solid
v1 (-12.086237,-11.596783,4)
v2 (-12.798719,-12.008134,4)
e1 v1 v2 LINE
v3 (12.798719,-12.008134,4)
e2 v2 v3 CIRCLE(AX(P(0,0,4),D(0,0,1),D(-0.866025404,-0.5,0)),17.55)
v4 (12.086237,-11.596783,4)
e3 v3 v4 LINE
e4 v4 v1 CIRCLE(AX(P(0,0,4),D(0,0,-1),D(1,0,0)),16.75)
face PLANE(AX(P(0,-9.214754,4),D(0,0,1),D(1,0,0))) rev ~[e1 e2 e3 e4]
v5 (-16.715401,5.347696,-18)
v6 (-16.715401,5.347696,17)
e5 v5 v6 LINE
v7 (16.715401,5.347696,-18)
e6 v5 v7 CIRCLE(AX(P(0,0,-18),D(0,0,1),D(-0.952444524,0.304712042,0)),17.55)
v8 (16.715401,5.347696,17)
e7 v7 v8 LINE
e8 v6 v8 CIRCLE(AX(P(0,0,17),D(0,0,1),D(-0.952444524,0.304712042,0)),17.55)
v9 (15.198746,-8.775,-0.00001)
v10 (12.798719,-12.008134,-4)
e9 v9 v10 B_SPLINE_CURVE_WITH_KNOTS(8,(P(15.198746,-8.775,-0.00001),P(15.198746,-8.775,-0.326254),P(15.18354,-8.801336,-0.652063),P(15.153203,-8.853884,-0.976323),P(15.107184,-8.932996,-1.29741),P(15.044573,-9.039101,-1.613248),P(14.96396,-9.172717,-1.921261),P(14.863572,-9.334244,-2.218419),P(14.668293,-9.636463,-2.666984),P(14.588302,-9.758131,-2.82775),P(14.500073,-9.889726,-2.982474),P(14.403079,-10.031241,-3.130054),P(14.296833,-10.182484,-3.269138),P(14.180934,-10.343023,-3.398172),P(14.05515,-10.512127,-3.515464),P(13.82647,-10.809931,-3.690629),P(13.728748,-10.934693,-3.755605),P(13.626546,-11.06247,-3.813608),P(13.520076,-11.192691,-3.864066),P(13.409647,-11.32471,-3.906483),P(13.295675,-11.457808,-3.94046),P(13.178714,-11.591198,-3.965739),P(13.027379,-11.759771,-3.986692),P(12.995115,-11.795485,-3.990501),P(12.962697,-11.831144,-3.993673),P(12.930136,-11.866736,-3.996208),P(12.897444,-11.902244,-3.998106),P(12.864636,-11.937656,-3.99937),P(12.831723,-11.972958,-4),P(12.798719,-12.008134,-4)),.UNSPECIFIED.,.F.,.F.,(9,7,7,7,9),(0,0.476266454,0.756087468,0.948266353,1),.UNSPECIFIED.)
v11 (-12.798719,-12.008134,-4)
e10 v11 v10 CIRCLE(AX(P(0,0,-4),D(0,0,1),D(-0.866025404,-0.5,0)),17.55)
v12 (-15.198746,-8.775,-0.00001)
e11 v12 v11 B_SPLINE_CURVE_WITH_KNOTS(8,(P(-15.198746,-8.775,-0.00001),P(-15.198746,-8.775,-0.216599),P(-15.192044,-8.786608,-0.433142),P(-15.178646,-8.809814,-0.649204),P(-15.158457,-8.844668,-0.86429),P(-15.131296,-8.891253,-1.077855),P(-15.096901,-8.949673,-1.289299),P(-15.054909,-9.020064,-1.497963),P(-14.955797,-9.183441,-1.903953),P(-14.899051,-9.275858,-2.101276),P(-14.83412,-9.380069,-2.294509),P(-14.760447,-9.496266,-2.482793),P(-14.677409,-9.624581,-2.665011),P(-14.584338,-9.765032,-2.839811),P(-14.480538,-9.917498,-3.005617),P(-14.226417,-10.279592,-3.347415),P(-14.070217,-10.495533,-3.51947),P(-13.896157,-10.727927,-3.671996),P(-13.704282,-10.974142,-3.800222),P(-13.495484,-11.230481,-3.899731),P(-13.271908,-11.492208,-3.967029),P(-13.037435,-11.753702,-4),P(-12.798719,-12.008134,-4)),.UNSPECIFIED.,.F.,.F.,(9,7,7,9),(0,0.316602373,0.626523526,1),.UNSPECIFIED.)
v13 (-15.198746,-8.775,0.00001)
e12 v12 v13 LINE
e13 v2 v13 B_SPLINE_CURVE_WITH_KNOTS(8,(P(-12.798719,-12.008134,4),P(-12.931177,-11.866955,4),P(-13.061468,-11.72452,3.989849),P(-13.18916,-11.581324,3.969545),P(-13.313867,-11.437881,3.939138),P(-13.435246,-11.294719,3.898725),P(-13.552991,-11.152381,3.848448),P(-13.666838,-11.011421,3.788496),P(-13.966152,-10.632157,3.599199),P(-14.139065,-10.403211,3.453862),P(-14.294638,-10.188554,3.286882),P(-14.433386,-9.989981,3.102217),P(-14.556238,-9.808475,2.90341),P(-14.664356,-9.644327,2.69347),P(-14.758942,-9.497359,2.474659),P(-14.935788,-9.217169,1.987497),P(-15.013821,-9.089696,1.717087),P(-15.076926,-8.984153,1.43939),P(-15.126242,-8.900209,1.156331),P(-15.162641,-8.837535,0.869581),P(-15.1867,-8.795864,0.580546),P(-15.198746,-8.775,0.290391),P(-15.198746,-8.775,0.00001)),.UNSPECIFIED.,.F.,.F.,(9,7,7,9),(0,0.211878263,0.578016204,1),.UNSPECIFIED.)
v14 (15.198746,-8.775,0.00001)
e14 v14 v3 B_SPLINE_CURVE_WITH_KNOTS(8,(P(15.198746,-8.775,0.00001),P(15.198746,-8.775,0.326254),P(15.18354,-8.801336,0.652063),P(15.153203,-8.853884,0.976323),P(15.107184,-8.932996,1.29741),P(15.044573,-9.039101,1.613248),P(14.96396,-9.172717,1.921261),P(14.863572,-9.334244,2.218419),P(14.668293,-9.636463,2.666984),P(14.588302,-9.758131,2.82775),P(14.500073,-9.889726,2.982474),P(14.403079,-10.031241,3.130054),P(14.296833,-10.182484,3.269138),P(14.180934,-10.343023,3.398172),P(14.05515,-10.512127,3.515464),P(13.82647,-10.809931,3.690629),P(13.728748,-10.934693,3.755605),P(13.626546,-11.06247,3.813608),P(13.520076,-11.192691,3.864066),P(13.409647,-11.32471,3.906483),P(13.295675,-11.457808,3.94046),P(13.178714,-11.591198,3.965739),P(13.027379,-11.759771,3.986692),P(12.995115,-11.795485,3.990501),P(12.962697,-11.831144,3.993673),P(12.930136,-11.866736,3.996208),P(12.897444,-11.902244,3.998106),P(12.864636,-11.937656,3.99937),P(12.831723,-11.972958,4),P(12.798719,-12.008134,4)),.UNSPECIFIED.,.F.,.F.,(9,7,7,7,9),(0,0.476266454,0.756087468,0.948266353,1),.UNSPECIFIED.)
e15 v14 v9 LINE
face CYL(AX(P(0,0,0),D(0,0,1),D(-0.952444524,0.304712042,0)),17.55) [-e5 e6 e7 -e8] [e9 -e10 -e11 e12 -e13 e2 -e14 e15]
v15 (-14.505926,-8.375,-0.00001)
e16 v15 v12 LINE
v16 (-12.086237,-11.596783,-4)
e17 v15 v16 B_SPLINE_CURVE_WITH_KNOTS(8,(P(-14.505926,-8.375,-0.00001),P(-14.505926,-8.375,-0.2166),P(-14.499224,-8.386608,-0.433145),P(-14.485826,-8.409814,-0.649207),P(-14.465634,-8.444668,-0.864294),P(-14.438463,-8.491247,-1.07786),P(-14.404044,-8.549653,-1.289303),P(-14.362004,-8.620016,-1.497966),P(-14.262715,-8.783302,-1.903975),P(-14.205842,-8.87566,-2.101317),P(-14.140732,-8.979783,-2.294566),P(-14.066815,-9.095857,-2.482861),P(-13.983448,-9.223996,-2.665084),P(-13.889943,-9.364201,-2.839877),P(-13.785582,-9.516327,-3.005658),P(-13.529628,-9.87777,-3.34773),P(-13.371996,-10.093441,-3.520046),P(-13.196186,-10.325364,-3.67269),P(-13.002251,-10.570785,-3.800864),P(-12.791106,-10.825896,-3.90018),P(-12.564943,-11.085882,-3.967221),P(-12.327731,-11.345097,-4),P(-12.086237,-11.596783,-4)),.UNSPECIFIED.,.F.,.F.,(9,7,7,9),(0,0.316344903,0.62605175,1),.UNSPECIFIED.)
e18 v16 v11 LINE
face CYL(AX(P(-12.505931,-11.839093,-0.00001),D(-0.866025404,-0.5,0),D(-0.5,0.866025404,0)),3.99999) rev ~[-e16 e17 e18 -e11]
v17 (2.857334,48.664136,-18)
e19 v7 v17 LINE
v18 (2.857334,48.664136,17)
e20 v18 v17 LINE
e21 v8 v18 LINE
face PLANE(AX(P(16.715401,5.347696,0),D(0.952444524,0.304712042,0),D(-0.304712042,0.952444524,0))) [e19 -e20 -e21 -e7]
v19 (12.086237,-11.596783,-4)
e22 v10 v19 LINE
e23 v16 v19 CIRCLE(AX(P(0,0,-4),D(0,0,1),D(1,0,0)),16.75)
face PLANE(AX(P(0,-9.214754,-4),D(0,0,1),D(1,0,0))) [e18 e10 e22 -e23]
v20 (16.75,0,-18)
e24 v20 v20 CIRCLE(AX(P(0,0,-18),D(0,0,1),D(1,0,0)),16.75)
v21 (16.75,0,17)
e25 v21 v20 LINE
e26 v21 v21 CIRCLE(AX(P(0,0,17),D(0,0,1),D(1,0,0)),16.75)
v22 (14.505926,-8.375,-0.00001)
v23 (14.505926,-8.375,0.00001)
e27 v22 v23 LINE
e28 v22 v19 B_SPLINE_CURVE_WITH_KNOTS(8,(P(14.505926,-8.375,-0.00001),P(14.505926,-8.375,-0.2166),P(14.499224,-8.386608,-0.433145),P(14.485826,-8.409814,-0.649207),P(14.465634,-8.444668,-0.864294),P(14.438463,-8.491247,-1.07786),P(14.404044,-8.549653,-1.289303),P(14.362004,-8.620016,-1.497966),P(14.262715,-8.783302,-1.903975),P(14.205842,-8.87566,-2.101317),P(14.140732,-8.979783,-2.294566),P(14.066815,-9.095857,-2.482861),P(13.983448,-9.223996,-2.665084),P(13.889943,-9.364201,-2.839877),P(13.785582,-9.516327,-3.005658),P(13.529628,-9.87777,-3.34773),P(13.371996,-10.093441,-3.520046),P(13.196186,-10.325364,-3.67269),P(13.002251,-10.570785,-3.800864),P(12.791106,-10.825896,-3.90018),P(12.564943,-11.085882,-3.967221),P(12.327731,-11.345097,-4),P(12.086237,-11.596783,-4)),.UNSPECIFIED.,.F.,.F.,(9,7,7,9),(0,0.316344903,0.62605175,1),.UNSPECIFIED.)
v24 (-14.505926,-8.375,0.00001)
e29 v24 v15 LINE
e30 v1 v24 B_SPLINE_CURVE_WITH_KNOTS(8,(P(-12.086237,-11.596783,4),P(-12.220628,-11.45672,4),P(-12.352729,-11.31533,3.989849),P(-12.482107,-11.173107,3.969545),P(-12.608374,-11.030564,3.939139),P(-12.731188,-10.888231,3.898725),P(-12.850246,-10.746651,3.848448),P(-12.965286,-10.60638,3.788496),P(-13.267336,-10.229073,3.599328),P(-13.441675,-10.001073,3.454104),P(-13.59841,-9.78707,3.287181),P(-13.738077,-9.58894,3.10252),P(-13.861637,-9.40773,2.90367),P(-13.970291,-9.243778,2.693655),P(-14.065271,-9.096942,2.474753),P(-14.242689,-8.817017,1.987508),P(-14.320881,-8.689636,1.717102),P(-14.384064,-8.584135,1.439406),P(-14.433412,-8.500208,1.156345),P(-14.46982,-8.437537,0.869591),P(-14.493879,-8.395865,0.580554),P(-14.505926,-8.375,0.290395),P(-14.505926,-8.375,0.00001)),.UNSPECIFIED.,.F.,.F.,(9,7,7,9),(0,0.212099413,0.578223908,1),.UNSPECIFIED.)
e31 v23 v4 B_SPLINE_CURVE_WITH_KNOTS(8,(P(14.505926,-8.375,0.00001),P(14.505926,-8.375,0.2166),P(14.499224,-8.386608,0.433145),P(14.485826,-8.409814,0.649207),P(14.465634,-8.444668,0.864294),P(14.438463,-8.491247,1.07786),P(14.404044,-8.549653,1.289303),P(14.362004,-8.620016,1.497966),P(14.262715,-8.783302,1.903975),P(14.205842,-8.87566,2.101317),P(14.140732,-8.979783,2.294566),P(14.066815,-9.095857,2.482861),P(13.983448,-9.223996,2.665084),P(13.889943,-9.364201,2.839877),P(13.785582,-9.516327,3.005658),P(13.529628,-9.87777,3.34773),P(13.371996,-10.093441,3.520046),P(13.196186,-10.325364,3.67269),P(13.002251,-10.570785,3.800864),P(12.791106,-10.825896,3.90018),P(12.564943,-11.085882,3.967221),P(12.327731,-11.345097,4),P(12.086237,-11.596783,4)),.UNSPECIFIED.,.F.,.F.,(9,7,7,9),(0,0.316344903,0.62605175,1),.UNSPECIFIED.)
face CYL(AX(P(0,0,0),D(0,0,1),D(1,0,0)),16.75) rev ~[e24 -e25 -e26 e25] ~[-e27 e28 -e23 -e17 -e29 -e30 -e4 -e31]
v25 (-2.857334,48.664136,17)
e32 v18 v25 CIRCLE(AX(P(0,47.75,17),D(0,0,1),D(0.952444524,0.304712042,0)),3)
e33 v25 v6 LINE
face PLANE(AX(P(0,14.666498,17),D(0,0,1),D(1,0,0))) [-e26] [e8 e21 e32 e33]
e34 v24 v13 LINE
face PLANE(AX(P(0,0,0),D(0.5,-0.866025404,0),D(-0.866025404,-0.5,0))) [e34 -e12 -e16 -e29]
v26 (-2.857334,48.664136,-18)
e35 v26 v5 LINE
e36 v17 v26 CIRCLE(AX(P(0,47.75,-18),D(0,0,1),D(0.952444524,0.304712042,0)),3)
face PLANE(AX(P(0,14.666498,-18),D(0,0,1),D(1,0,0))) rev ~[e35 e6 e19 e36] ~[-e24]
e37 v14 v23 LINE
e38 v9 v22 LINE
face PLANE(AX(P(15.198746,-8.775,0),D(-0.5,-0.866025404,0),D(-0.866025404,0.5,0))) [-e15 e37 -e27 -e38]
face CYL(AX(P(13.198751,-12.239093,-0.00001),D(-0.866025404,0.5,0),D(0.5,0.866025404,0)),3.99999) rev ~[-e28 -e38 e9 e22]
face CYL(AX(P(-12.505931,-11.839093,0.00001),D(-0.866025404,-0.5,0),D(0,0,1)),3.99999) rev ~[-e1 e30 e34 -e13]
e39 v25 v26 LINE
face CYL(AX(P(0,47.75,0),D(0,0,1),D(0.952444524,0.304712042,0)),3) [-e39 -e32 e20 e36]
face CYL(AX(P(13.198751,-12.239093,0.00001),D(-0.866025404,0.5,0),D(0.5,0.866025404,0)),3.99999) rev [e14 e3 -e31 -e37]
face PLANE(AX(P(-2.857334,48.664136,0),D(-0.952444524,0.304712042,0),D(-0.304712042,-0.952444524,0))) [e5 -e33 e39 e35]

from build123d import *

# Parameters (mm, degrees)
F0_R          = 16.75
F1_DEPTH      = 17
F1_DEPTH_BACK = 18
F3_DEPTH      = 4
F3_DEPTH_BACK = 4
F4_R          = 3.99999


# Not quite as in the source:
# - a fillet or chamfer is up to 0.001 mm smaller than in the source, because OpenCascade refuses the exact size
# - a feature of the source that left no trace in its solid (it failed there, or was rolled back) is left out


with BuildPart() as f1:
    # F0 (on Top) → F1 (new body, two sides)
    with BuildSketch(Plane.XY) as f1_sk:
        with BuildLine():
            Line((-2.8573335724, 48.6641361257), (-16.7154013983, 5.3476963351))
            ThreePointArc((-16.7154013983, 5.3476963351), (0, -17.55), (16.7154013983, 5.3476963351))
            Line((16.7154013983, 5.3476963351), (2.8573335724, 48.6641361257))
            ThreePointArc((2.8573335724, 48.6641361257), (0, 50.75), (-2.8573335724, 48.6641361257))
        make_face()
        Circle(F0_R, mode=Mode.SUBTRACT)
    extrude(amount=F1_DEPTH)
    extrude(f1_sk.sketch, amount=-F1_DEPTH_BACK)

    # F2 (on Top) → F3 (cut, two sides)
    with BuildSketch(Plane.XY) as f3_sk:
        with BuildLine():
            Line((15.1987458364, -8.775), (0, 0))
            Line((0, 0), (-15.1987458364, -8.775))
            ThreePointArc((-15.1987458364, -8.775), (0, -17.55), (15.1987458364, -8.775))
        make_face()
    extrude(amount=F3_DEPTH, mode=Mode.SUBTRACT)
    extrude(f3_sk.sketch, amount=-F3_DEPTH_BACK, mode=Mode.SUBTRACT)

    # F4 (radius 4 in the source; OpenCascade refuses exactly that, so slightly less here)
    f4_edges = [f1.edges().sort_by_distance(p)[0] for p in [
        (-14.852336, -8.575, 4),
        (-14.852336, -8.575, -4),
        (14.852336, -8.575, -4),
        (14.852336, -8.575, 4),
    ]]
    fillet(f4_edges, radius=F4_R)


solid = f1.part
